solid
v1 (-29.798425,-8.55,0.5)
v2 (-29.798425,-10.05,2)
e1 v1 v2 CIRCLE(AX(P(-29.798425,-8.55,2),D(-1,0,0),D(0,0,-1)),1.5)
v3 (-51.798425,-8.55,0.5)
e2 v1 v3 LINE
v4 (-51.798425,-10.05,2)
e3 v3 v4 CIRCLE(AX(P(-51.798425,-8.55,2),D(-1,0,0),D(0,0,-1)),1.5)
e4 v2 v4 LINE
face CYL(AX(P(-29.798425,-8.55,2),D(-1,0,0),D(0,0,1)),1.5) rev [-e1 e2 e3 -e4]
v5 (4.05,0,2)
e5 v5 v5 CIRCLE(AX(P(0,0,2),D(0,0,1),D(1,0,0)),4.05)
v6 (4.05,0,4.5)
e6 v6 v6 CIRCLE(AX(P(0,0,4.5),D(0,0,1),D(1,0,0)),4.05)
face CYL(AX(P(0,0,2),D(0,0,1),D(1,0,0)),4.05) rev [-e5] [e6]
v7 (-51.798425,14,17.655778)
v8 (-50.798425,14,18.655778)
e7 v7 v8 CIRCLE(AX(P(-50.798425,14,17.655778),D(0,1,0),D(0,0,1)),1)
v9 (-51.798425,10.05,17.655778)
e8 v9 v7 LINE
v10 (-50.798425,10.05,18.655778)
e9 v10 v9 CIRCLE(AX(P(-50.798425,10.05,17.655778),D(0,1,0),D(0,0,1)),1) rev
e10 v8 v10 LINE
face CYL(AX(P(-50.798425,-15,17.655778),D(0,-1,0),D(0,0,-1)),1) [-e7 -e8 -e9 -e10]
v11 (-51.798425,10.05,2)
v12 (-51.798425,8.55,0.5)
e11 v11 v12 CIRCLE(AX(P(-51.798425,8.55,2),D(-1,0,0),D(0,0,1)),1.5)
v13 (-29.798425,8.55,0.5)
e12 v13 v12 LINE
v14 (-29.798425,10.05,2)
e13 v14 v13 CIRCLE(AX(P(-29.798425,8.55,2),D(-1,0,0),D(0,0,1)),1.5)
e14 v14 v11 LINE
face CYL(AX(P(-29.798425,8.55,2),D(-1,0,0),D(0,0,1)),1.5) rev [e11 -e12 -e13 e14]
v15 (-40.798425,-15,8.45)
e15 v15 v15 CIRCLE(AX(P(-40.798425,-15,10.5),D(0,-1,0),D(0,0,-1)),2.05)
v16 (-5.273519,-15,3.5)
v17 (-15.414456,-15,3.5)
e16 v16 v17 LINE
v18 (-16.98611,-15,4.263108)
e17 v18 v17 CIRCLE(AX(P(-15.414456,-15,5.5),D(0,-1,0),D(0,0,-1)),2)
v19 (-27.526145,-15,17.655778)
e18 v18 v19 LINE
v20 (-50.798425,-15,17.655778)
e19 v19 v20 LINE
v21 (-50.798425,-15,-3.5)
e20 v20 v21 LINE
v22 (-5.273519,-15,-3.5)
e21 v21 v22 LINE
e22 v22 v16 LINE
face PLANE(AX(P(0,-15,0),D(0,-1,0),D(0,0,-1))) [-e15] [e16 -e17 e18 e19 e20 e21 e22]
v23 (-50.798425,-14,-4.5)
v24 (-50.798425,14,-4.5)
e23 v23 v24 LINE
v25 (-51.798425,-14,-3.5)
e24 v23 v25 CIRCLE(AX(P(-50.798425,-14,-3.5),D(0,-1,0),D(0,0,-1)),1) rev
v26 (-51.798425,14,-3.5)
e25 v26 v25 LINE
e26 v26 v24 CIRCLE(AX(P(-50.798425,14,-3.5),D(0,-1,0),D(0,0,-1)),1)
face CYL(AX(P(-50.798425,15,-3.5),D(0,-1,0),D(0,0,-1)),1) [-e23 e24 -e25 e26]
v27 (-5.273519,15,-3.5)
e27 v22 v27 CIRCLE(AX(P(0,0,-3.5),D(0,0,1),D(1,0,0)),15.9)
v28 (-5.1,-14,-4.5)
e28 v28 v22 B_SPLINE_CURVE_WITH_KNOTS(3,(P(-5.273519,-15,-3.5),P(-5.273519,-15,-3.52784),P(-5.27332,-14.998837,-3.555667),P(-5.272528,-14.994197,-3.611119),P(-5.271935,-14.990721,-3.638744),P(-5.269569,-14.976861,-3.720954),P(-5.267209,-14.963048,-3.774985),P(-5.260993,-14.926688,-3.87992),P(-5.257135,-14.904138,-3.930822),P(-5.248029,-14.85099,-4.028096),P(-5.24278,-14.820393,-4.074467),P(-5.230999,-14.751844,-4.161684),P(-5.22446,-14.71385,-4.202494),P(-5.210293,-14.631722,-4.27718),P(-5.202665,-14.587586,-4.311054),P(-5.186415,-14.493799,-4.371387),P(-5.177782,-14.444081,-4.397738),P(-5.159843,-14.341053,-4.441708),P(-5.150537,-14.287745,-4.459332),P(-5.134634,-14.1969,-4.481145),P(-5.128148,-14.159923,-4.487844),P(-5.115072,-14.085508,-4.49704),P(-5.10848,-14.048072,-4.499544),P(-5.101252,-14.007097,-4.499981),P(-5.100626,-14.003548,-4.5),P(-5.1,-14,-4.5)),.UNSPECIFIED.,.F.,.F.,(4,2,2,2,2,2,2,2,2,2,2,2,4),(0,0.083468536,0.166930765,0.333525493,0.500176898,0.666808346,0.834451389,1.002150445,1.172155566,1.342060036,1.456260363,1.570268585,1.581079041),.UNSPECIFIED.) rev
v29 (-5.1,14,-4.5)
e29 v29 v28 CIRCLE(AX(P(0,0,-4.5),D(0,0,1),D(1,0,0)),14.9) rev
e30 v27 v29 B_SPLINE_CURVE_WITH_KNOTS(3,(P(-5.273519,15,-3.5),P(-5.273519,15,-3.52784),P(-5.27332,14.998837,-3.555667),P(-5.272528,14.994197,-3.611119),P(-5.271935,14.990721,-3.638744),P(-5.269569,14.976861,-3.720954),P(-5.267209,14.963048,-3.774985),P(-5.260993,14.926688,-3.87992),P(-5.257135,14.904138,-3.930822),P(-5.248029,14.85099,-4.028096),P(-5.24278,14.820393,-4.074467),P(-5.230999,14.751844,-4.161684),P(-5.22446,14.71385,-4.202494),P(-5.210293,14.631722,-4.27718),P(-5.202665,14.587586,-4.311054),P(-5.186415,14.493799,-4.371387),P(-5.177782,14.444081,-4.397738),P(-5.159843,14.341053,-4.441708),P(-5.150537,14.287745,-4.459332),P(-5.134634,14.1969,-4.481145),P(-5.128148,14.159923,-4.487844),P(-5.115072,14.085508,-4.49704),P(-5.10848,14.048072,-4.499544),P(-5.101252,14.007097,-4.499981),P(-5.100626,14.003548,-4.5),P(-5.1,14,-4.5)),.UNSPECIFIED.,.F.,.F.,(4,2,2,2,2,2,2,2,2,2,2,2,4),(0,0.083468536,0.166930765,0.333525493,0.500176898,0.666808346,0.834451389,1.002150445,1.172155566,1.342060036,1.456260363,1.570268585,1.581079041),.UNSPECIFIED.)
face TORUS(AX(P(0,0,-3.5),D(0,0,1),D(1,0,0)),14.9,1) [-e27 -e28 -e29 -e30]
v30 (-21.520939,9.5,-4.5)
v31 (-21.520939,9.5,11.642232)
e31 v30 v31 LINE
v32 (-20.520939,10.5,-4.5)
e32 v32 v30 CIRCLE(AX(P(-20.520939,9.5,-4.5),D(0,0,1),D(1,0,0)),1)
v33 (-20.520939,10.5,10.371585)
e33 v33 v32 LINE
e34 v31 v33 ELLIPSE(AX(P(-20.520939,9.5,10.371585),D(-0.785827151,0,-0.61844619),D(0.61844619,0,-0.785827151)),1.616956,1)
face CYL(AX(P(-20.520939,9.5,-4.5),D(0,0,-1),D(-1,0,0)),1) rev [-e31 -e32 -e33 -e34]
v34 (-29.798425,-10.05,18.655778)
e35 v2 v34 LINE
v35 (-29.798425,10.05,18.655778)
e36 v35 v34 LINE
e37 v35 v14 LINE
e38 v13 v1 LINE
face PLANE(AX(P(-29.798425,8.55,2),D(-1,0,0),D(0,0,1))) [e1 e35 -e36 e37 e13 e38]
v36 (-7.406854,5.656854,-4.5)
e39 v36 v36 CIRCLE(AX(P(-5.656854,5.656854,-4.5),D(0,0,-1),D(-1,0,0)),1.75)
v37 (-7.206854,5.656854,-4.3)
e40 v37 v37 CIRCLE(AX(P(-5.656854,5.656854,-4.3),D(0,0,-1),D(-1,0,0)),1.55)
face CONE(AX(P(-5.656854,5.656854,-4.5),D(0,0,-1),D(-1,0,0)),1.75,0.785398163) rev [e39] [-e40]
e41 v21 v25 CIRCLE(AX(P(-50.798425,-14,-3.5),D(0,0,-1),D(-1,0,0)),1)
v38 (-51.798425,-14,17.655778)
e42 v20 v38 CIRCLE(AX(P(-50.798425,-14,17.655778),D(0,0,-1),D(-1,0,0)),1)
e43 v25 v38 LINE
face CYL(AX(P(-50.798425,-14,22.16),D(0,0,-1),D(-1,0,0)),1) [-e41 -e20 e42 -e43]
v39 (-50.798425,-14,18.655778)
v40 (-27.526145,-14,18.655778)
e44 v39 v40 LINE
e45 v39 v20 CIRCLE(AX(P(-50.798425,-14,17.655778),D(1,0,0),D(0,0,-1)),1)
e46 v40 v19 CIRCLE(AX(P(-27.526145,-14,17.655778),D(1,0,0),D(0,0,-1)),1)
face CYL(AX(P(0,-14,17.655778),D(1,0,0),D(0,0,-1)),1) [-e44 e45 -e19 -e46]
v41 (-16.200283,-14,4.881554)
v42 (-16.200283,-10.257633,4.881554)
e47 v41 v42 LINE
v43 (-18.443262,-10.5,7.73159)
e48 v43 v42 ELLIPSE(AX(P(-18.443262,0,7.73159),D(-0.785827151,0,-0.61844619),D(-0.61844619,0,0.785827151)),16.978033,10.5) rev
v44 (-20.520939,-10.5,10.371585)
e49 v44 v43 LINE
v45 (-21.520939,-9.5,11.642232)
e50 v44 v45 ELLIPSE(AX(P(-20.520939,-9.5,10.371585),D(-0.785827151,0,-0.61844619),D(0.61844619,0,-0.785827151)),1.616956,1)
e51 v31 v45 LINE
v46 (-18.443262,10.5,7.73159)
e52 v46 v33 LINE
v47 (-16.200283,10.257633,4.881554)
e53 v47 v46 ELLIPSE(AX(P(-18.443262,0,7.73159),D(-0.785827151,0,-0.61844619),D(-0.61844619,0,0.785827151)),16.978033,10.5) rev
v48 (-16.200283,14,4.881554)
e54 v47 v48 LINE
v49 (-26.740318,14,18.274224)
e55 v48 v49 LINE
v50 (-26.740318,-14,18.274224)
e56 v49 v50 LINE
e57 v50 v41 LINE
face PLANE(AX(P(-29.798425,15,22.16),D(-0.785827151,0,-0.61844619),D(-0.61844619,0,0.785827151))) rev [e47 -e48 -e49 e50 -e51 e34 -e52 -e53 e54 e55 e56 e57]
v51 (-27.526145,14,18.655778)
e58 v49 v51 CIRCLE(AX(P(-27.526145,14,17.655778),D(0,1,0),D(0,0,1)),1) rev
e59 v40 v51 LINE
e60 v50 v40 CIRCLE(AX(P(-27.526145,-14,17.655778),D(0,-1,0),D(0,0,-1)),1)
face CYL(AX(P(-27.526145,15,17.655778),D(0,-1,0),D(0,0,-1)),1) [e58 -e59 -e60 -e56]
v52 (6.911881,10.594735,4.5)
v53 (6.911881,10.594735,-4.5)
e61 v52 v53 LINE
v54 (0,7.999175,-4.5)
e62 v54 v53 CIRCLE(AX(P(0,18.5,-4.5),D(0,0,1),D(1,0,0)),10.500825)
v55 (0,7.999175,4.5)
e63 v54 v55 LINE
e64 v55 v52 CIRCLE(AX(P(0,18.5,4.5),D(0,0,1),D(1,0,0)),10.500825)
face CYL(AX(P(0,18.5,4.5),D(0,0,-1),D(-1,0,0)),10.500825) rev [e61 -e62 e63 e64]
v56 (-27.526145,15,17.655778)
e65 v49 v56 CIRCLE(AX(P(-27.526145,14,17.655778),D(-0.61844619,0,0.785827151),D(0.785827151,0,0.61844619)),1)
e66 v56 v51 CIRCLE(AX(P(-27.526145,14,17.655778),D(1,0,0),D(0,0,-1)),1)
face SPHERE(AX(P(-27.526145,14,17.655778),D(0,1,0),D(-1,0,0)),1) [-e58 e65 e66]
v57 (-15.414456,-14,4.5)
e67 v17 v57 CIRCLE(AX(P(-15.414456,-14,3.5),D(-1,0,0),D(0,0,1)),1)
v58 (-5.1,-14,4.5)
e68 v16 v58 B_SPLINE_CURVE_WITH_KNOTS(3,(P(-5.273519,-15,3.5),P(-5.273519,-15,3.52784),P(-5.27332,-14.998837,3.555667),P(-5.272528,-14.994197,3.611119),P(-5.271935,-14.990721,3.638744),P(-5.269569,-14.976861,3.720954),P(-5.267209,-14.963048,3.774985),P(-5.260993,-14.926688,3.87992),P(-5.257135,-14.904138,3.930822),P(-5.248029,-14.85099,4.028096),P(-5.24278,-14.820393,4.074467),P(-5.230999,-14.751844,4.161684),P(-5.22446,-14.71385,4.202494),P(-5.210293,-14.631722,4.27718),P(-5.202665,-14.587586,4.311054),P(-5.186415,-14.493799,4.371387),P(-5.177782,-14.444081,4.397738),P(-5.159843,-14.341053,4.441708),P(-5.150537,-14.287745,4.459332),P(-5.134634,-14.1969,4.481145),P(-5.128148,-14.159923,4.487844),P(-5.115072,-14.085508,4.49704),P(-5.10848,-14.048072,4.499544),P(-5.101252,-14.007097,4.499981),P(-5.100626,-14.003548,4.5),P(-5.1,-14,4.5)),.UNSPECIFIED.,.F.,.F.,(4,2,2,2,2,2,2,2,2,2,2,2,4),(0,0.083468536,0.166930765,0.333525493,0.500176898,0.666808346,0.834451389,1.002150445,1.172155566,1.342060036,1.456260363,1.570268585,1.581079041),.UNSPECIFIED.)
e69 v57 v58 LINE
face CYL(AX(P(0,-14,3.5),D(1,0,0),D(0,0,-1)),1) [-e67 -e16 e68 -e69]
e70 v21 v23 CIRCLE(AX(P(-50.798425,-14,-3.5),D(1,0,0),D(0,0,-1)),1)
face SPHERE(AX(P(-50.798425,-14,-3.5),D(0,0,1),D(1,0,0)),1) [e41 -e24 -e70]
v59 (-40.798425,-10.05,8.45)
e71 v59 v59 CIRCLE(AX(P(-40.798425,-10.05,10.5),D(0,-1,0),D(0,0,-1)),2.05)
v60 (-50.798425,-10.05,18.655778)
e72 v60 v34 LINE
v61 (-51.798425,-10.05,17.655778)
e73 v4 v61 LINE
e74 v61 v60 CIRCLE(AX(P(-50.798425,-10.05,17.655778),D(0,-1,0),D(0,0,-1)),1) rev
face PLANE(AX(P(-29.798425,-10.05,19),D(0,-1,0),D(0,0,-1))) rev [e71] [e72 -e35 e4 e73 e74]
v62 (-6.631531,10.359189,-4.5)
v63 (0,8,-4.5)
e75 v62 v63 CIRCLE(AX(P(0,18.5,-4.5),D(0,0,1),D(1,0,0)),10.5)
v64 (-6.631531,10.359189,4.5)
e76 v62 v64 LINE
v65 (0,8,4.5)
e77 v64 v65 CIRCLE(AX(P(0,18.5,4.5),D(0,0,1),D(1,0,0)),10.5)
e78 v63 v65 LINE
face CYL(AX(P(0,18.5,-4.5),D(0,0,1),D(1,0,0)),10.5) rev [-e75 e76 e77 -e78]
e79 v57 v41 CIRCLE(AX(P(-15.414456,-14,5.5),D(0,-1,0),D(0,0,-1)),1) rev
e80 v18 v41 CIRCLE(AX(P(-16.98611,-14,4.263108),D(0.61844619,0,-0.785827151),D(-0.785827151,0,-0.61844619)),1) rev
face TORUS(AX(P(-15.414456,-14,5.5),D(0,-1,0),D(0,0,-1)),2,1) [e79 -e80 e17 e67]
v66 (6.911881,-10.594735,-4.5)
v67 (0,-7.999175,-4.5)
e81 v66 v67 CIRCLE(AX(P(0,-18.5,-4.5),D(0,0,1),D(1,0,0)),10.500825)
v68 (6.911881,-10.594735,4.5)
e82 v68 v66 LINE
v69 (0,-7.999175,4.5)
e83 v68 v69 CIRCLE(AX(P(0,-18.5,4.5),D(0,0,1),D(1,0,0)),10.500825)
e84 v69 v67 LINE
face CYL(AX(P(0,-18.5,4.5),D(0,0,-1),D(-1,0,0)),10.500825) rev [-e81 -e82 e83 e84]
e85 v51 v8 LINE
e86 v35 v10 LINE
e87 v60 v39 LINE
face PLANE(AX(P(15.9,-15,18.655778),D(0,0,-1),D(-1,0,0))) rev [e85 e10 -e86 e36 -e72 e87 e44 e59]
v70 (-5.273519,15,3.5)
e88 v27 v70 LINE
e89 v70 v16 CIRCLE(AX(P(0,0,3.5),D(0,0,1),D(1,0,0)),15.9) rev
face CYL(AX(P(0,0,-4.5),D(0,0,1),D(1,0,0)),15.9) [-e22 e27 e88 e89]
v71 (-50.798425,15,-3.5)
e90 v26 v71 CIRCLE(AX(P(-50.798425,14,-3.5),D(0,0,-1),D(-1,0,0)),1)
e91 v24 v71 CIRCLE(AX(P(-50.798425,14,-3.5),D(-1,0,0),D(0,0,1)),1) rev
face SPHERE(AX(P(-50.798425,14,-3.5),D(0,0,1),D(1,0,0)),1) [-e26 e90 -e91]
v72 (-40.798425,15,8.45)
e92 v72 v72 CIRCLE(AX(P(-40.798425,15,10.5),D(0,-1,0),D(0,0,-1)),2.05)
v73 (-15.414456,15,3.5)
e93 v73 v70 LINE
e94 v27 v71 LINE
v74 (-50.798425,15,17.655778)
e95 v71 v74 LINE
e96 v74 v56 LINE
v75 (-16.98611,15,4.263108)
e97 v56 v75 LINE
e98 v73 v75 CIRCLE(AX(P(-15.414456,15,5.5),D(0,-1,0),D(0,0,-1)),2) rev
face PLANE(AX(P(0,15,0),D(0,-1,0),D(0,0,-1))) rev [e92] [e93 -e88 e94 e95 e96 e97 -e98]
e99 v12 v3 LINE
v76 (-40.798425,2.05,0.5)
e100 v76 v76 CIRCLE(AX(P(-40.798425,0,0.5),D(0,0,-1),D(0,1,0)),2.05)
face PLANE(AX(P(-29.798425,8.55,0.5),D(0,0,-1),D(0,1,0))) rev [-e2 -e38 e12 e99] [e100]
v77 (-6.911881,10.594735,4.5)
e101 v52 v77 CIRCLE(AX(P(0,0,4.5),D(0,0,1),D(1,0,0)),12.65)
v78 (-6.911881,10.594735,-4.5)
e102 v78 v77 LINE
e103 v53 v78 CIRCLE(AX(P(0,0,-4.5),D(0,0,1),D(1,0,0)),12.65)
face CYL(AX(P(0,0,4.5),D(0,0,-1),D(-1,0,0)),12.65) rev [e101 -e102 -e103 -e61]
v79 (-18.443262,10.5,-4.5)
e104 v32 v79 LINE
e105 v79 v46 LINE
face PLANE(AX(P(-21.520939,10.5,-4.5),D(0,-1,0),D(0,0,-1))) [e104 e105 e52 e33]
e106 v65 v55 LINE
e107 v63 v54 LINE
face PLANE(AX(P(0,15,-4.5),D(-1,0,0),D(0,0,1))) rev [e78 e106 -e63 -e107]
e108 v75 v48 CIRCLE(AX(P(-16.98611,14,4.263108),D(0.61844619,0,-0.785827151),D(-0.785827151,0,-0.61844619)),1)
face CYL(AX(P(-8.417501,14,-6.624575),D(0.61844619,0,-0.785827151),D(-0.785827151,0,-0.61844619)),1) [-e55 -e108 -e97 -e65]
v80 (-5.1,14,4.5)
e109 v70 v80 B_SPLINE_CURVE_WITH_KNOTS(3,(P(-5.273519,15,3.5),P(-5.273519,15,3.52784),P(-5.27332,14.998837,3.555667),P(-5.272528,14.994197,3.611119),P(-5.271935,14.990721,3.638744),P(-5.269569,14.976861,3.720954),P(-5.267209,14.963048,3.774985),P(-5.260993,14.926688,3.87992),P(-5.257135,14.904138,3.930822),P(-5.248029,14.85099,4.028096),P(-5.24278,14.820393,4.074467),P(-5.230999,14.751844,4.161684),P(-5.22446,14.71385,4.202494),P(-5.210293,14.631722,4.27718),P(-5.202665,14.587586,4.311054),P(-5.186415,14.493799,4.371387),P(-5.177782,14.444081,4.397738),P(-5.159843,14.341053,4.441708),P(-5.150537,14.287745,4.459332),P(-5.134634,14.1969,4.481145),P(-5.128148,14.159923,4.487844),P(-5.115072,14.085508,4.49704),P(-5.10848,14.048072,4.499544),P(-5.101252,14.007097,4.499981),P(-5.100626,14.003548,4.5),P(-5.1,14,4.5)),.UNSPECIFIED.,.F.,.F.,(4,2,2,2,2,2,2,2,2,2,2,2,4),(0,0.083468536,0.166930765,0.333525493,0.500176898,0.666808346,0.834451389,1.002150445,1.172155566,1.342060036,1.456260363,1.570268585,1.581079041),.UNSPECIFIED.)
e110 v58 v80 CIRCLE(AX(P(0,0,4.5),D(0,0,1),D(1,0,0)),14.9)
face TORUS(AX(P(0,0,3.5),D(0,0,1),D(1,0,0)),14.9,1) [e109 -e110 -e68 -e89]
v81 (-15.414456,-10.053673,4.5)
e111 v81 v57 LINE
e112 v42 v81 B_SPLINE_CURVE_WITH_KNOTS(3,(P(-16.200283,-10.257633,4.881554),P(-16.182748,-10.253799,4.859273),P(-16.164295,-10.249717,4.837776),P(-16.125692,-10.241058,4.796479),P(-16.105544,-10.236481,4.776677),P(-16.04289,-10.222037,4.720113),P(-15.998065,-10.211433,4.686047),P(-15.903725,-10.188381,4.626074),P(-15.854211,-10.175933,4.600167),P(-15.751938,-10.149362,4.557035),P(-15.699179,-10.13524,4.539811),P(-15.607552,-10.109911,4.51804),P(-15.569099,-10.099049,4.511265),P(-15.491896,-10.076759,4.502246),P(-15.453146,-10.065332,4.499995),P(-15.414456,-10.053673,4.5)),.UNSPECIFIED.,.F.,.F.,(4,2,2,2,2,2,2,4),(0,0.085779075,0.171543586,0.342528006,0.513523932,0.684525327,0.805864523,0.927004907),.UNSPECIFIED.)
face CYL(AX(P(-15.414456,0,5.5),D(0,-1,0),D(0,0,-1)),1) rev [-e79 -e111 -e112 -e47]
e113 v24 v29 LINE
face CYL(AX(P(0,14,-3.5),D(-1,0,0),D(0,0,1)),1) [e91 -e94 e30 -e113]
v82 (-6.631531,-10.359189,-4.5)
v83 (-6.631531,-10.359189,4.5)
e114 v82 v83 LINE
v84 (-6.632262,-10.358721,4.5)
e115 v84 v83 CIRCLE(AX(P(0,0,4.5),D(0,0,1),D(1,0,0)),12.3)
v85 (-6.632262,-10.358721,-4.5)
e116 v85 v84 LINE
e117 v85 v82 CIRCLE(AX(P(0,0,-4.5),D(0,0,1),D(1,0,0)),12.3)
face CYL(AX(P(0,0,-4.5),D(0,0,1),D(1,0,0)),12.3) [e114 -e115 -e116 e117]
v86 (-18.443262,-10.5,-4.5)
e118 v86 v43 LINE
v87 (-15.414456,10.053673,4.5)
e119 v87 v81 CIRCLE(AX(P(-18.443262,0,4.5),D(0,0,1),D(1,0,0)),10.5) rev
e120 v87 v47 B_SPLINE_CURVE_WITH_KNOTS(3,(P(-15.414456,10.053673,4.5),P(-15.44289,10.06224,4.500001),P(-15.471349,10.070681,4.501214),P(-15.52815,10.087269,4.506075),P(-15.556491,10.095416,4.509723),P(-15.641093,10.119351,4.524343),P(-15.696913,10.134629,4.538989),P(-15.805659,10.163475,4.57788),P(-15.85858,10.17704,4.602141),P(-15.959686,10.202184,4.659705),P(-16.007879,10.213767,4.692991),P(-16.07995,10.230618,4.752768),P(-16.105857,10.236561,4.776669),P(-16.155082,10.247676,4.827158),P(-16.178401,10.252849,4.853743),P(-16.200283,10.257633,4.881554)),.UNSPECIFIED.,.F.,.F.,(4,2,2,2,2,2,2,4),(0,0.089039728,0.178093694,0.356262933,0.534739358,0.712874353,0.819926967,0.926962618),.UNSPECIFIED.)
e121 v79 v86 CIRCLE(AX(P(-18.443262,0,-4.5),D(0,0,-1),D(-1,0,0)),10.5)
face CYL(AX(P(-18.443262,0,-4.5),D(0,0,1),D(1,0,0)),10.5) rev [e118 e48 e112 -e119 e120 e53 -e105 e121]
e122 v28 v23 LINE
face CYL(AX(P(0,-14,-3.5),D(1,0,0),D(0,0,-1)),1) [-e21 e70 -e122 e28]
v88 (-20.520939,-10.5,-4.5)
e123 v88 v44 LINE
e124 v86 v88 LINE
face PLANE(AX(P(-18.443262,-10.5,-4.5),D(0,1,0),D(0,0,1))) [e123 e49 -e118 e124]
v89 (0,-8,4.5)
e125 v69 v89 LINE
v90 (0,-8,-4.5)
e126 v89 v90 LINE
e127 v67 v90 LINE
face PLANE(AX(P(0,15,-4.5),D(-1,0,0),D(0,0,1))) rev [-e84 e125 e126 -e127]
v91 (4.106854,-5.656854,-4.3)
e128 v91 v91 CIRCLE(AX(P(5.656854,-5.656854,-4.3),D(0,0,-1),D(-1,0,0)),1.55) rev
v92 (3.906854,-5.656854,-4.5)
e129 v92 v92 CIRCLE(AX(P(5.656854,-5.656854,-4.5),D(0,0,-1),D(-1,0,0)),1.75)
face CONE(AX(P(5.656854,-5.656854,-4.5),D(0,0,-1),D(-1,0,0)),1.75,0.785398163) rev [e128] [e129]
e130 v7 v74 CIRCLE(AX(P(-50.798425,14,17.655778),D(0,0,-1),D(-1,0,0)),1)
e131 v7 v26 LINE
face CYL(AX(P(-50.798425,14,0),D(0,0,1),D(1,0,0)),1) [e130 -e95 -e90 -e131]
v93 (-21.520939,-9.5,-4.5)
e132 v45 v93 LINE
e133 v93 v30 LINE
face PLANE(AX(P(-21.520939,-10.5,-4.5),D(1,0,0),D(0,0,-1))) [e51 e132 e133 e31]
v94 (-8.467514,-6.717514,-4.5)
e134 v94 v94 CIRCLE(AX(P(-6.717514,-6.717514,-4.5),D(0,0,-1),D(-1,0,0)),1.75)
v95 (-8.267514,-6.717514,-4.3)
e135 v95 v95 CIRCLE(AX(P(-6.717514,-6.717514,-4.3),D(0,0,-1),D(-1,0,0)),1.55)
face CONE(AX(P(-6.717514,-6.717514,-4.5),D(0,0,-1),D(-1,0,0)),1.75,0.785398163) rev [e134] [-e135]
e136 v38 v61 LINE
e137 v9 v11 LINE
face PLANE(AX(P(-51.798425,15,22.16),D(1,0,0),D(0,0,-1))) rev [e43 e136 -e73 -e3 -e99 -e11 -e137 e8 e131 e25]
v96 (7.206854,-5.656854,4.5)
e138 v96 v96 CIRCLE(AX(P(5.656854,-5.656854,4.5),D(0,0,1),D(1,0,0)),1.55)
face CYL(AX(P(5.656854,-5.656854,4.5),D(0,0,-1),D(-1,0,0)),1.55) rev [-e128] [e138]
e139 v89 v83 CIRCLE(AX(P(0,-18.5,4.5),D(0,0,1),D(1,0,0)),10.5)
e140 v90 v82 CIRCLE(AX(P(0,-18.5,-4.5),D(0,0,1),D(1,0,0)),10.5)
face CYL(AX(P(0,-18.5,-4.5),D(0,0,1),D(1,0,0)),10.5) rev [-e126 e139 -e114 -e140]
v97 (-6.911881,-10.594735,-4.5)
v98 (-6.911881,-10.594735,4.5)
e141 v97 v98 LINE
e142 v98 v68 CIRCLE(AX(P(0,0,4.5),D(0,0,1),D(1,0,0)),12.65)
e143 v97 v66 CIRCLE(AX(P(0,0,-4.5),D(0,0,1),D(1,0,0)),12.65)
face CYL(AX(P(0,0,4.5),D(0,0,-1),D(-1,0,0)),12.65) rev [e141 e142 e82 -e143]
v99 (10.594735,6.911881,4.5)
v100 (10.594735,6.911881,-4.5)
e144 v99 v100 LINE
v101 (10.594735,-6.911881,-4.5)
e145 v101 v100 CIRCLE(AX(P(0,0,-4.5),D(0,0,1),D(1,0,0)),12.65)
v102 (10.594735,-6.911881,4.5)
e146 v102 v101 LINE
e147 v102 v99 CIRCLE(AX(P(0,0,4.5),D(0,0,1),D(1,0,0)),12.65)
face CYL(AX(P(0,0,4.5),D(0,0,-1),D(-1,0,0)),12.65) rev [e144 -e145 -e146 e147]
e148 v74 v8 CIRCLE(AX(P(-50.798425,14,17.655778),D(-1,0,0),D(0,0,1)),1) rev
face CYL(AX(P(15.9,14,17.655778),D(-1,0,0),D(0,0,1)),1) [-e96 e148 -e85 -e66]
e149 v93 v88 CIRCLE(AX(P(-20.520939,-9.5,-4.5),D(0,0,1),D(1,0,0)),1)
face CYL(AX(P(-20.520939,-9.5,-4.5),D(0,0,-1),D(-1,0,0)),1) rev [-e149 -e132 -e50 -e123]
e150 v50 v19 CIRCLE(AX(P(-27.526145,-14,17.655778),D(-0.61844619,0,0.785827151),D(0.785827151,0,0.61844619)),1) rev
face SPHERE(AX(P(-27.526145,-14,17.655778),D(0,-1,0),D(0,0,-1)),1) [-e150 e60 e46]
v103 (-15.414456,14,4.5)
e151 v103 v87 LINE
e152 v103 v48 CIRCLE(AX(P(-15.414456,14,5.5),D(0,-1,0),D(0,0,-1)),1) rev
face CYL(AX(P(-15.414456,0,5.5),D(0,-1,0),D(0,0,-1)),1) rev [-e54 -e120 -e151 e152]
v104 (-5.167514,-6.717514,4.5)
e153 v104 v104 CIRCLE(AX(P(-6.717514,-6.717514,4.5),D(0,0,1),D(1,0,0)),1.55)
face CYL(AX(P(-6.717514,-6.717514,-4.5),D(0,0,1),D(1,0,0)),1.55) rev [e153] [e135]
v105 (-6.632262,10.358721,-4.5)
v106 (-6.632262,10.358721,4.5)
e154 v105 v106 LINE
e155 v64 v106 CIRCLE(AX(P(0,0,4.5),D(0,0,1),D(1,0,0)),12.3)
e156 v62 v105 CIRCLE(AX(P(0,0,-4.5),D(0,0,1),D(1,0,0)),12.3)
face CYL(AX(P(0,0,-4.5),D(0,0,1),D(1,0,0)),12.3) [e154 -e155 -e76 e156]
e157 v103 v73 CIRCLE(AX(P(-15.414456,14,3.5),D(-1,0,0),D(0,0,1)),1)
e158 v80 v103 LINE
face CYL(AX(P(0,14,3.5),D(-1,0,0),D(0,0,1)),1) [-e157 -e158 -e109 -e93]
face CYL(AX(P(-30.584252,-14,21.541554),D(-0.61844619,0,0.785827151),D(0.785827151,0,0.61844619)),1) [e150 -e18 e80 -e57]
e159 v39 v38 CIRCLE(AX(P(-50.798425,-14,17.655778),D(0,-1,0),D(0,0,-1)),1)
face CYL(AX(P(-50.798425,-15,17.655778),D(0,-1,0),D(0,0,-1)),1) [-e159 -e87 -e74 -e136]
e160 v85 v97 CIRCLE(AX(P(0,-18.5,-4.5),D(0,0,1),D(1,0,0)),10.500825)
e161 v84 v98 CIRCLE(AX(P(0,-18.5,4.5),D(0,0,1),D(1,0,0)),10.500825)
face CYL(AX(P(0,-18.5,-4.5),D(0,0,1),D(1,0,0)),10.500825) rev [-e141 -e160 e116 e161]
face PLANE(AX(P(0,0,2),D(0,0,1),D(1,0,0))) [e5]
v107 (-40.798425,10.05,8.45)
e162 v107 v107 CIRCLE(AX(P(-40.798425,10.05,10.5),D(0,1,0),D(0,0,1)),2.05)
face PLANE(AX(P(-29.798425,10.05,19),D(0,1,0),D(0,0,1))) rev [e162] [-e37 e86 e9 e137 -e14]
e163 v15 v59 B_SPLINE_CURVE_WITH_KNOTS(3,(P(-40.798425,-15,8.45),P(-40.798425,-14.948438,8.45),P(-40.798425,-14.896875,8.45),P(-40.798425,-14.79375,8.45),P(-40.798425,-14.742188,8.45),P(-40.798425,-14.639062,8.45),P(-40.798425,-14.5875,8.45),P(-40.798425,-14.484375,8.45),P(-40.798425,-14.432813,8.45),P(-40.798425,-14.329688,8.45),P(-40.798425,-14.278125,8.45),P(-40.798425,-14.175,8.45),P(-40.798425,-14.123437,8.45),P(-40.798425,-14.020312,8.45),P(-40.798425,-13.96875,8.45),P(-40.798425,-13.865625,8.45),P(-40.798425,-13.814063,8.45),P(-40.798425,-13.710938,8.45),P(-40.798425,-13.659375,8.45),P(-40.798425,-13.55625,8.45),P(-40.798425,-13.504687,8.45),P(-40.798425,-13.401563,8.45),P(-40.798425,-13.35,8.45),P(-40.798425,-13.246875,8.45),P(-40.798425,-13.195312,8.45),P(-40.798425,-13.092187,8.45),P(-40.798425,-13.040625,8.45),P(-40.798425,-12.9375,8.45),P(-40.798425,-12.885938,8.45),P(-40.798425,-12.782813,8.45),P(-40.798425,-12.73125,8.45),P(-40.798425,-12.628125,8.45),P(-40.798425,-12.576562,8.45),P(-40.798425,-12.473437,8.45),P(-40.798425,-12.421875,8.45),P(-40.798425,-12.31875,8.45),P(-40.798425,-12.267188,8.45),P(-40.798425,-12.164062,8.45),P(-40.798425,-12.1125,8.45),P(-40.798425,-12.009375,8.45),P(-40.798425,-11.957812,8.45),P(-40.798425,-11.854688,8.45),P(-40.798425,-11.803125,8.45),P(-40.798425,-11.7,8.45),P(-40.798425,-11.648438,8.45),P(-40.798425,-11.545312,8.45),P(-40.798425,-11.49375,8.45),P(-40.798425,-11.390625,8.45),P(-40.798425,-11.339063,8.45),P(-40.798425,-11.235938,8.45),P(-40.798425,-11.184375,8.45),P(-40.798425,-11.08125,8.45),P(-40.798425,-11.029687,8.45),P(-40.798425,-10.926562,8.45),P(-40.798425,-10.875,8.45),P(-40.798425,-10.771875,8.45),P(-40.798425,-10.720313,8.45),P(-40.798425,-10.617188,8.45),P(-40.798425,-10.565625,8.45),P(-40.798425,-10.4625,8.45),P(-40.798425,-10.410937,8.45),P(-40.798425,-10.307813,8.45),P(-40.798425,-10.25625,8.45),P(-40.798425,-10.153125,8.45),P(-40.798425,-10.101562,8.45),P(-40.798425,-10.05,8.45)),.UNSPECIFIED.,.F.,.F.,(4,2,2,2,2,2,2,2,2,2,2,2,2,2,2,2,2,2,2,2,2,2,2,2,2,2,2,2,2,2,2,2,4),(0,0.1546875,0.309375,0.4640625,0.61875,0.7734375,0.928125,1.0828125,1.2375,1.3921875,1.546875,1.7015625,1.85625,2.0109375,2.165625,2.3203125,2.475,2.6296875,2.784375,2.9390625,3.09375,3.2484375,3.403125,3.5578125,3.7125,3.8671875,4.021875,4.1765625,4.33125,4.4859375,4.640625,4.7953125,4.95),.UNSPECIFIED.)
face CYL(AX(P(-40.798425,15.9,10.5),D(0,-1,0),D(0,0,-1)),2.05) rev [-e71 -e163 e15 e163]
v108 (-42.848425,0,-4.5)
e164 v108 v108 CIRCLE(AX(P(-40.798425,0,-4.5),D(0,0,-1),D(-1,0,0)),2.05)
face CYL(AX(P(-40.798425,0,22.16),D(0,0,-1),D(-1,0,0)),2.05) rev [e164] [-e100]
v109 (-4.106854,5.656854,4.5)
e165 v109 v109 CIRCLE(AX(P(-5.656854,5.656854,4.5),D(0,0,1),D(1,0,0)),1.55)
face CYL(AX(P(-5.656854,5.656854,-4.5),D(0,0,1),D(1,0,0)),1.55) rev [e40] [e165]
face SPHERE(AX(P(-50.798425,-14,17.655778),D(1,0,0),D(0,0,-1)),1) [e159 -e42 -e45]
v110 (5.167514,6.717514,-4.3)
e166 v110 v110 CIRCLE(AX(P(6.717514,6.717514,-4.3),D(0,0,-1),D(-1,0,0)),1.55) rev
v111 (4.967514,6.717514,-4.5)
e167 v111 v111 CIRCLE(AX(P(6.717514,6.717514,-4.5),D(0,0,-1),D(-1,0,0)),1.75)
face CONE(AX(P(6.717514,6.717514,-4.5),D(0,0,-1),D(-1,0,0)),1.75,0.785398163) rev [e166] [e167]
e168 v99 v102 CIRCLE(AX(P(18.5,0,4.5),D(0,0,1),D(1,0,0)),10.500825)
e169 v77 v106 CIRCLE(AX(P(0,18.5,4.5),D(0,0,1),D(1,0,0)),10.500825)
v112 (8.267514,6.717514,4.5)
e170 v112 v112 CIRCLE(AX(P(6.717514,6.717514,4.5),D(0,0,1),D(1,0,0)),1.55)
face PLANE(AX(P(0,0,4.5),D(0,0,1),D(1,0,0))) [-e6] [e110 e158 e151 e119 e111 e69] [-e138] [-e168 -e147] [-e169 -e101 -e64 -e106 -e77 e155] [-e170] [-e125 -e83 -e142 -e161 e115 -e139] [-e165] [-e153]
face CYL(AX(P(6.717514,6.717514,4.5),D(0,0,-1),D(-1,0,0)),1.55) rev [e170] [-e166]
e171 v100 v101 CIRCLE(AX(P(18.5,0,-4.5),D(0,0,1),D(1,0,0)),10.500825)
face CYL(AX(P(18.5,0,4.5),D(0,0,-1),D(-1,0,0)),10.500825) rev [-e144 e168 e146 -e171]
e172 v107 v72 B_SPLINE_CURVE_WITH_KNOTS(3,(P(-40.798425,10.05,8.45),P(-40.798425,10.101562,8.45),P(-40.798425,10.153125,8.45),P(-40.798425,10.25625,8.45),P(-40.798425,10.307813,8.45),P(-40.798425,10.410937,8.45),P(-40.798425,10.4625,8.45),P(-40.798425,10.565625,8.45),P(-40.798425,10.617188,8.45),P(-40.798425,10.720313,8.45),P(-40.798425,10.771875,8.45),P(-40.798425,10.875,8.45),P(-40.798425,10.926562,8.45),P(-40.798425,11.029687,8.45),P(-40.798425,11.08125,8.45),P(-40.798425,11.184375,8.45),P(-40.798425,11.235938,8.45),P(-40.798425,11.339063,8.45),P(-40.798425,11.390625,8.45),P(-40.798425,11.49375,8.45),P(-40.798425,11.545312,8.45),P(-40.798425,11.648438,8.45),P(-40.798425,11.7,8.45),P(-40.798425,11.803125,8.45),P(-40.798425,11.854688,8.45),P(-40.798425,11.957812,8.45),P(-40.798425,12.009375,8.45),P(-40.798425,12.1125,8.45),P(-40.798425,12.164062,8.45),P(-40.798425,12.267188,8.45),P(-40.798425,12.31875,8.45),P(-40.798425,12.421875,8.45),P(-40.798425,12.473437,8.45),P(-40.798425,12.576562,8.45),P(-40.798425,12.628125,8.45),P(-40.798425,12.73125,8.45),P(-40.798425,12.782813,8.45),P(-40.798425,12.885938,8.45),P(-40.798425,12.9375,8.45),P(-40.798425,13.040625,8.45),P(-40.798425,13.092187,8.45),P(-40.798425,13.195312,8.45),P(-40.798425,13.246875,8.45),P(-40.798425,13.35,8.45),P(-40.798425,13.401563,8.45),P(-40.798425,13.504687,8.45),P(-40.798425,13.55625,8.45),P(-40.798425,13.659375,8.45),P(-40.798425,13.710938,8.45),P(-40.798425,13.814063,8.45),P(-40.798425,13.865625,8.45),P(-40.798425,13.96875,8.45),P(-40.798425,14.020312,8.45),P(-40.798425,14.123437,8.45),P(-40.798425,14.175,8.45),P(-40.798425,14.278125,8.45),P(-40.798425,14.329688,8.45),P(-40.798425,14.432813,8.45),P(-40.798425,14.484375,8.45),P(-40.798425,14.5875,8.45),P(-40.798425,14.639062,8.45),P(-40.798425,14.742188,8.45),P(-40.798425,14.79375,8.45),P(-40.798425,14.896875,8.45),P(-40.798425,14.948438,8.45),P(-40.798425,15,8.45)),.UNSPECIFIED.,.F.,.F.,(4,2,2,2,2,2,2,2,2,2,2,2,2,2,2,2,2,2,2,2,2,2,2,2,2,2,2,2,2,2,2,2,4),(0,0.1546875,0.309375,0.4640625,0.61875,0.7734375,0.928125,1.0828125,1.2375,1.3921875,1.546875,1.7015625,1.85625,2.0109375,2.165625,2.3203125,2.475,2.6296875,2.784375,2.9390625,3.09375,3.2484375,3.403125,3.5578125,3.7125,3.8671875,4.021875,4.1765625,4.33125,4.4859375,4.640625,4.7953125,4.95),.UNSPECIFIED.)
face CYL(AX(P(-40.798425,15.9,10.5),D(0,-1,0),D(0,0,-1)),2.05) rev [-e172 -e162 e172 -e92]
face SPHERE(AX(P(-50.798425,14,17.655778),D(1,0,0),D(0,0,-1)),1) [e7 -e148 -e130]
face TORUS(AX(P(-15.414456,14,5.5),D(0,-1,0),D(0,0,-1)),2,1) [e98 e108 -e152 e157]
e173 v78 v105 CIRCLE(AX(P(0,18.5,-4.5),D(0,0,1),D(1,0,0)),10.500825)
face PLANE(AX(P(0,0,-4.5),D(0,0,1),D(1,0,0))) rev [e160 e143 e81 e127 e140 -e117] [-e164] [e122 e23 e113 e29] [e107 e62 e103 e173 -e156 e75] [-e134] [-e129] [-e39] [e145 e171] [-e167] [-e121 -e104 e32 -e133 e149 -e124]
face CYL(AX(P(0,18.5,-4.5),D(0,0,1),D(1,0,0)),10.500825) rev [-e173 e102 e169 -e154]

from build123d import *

# Parameters (mm, degrees)
ESQUISSE4_R                   = 13.9
ESQUISSE4_R_2                 = 1.55
BOSS_EXTRU_3_DEPTH            = 4.5
ESQUISSE7_R                   = 15.9
ESQUISSE7_R_2                 = 13.9
BOSS_EXTRU_7_DEPTH            = 9
BOSS_EXTRU_8_DEPTH            = 30
ENL_V_START                   = -4.5
ENL_V_MAT_EXTRU_12_OUTLINE_R  = 1.55
ENL_V_MAT_EXTRU_12_DEPTH      = 9
TROU_TARAUD_M32_D             = 2.5
TROU_TARAUD_M32_DEPTH         = 26.66
TROU_TARAUD_M32_CSINK_D       = 3.5
TROU_TARAUD_M32_CSINK_ANGLE   = 90
ENL_V_MAT_EXTRU_1_DEPTH       = 22
ESQUISSE13_R                  = 2.05
ENL_V_MAT_EXTRU_4_DEPTH       = 65.256925163
ESQUISSE15_R                  = 2.05
ENL_V_MAT_EXTRU_5_DEPTH       = 61.387436039
ENL_V_MAT_EXTRU_6_DEPTH       = 73.985973625
ESQUISSE24_R                  = 4.05
ENL_V_MAT_EXTRU_9_DEPTH       = 2.5
TROU_TARAUD_M33_D             = 2.5
TROU_TARAUD_M33_DEPTH         = 23.155777755
TROU_TARAUD_M33_CSINK_D       = 3.5
TROU_TARAUD_M33_CSINK_ANGLE   = 90
CONG_2_R                      = 1
ENL_V_MAT_EXTRU_13_DEPTH      = 57.002436454
ENL_V_MAT_EXTRU_13_DEPTH_BACK = 57.002436454
CONG_3_R                      = 1
CONG_4_R                      = 1


# Read off the part's stored shape, not the designer's step: Enlèv. mat.-Extru.12
with BuildPart() as part:
    # Esquisse4 → Boss.-Extru.3 (new, symmetric)
    with BuildSketch(Plane.XY):
        Circle(ESQUISSE4_R)
        with Locations((-6.717514421, -6.717514421)):
            Circle(ESQUISSE4_R_2, mode=Mode.SUBTRACT)
        with Locations((6.717514421, 6.717514421)):
            Circle(ESQUISSE4_R_2, mode=Mode.SUBTRACT)
        with Locations((-5.656854249, 5.656854249)):
            Circle(ESQUISSE4_R_2, mode=Mode.SUBTRACT)
        with Locations((5.656854249, -5.656854249)):
            Circle(ESQUISSE4_R_2, mode=Mode.SUBTRACT)
        with BuildLine():
            ThreePointArc((-10.594734512, 6.911881121), (-12.65, 0), (-10.594734512, -6.911881121))
            ThreePointArc((-10.594734512, -6.911881121), (-7.999175124, 0), (-10.594734512, 6.911881121))
        make_face(mode=Mode.SUBTRACT)
        with BuildLine():
            ThreePointArc((6.911881121, -10.594734512), (0, -7.999175124), (-6.911881121, -10.594734512))
            ThreePointArc((-6.911881121, -10.594734512), (0, -12.65), (6.911881121, -10.594734512))
        make_face(mode=Mode.SUBTRACT)
        with BuildLine():
            ThreePointArc((-6.911881121, 10.594734512), (0, 7.999175124), (6.911881121, 10.594734512))
            ThreePointArc((6.911881121, 10.594734512), (0, 12.65), (-6.911881121, 10.594734512))
        make_face(mode=Mode.SUBTRACT)
        with BuildLine():
            ThreePointArc((10.594734512, 6.911881121), (7.999175124, 0), (10.594734512, -6.911881121))
            ThreePointArc((10.594734512, -6.911881121), (12.65, 0), (10.594734512, 6.911881121))
        make_face(mode=Mode.SUBTRACT)
    extrude(amount=BOSS_EXTRU_3_DEPTH, both=True)

    # Esquisse7 → Boss.-Extru.7 (add)
    with BuildSketch(Plane.XY.offset(4.5)):
        Circle(ESQUISSE7_R)
        Circle(ESQUISSE7_R_2, mode=Mode.SUBTRACT)
    extrude(amount=-BOSS_EXTRU_7_DEPTH)

    # Esquisse6 → Boss.-Extru.8 (add)
    with BuildSketch(Plane(origin=(0, -15, 0), x_dir=(1, 0, 0), z_dir=(0, 1, 0))):
        Polygon((-51.798424989, -22.16), (-29.798424989, -22.16), (-15.9, -4.5), (0, -4.5), (0, 4.5), (-15.9, 4.5), (-51.798424989, 4.5), align=None)
    extrude(amount=BOSS_EXTRU_8_DEPTH)

    # Enlèv. mat.-Extru.12 outline → Enlèv. mat.-Extru.12 (cut)
    with BuildSketch(Plane.XY.offset(ENL_V_START)):
        with BuildLine():
            ThreePointArc((0, 12.65), (-3.605489456, 12.125301884), (-6.911881121, 10.594734512))
            ThreePointArc((-6.911881121, 10.594734512), (-6.773099648, 10.475509721), (-6.632262004, 10.358720998))
            ThreePointArc((-6.632262004, 10.358720998), (-6.631896353, 10.3589551), (-6.631530694, 10.359189189))
            ThreePointArc((-6.631530694, 10.359189189), (-3.519338467, 8.607363508), (0, 8))
            Line((0, 8), (0, 12.65))
        make_face()
        with BuildLine():
            ThreePointArc((-6.911881121, -10.594734512), (-3.605489456, -12.125301884), (0, -12.65))
            Line((0, -12.65), (0, -8))
            ThreePointArc((0, -8), (-3.519338467, -8.607363508), (-6.631530694, -10.359189189))
            ThreePointArc((-6.631530694, -10.359189189), (-6.631896353, -10.3589551), (-6.632262004, -10.358720998))
            ThreePointArc((-6.632262004, -10.358720998), (-6.773099648, -10.475509721), (-6.911881121, -10.594734512))
        make_face()
        with BuildLine():
            ThreePointArc((-10.358720998, 6.632262004), (-10.475509721, 6.773099648), (-10.594734512, 6.911881121))
            ThreePointArc((-10.594734512, 6.911881121), (-12.65, 0), (-10.594734512, -6.911881121))
            ThreePointArc((-10.594734512, -6.911881121), (-10.475509721, -6.773099648), (-10.358720998, -6.632262004))
            ThreePointArc((-10.358720998, -6.632262004), (-10.3589551, -6.631896353), (-10.359189189, -6.631530694))
            ThreePointArc((-10.359189189, -6.631530694), (-8, 0), (-10.359189189, 6.631530694))
            ThreePointArc((-10.359189189, 6.631530694), (-10.3589551, 6.631896353), (-10.358720998, 6.632262004))
        make_face()
        with Locations((-6.717514421, -6.717514421)):
            Circle(ENL_V_MAT_EXTRU_12_OUTLINE_R)
        with Locations((-5.656854249, 5.656854249)):
            Circle(ENL_V_MAT_EXTRU_12_OUTLINE_R)
    extrude(amount=ENL_V_MAT_EXTRU_12_DEPTH, mode=Mode.SUBTRACT)

    # Trou taraudé M32
    with Locations(Plane(origin=(5.656854249, -5.656854249, -4.5), x_dir=(-1, 0, 0), z_dir=(0, 0, -1))):
        with Locations((0, 0), (-1.060660172, 12.37436867)):
            CounterSinkHole(TROU_TARAUD_M32_D / 2, TROU_TARAUD_M32_CSINK_D / 2, depth=TROU_TARAUD_M32_DEPTH, counter_sink_angle=TROU_TARAUD_M32_CSINK_ANGLE)

    # Esquisse8 → Enlèv. mat.-Extru.1 (cut)
    with BuildSketch(Plane.ZY.offset(51.798424989)):
        with BuildLine():
            Line((19, 10.05), (2, 10.05))
            ThreePointArc((2, 10.05), (0.939339828, 9.610660172), (0.5, 8.55))
            Line((0.5, 8.55), (0.5, -8.55))
            ThreePointArc((0.5, -8.55), (0.939339828, -9.610660172), (2, -10.05))
            Line((2, -10.05), (19, -10.05))
            ThreePointArc((19, -10.05), (20.060660172, -9.610660172), (20.5, -8.55))
            Line((20.5, -8.55), (20.5, 8.55))
            ThreePointArc((20.5, 8.55), (20.060660172, 9.610660172), (19, 10.05))
        make_face()
    extrude(amount=-ENL_V_MAT_EXTRU_1_DEPTH, mode=Mode.SUBTRACT)

    # Esquisse13 → Enlèv. mat.-Extru.4 (cut, through all)
    with BuildSketch(Plane.XZ.offset(15)):
        with Locations(Location((-40.798424989, 10.5, 0), (0, 0, 270))):
            Circle(ESQUISSE13_R)
    extrude(amount=-ENL_V_MAT_EXTRU_4_DEPTH, mode=Mode.SUBTRACT)

    # Esquisse15 → Enlèv. mat.-Extru.5 (cut, through all)
    with BuildSketch(Plane(origin=(0, 0, -4.5), x_dir=(-1, 0, 0), z_dir=(0, 0, -1))):
        with Locations((40.798424989, 0)):
            Circle(ESQUISSE15_R)
    extrude(amount=-ENL_V_MAT_EXTRU_5_DEPTH, mode=Mode.SUBTRACT)

    # Esquisse16 → Enlèv. mat.-Extru.6 (cut, through all)
    with BuildSketch(Plane.ZY.offset(51.798424989)):
        Polygon((18.655777755, 10.05), (18.655777755, -10.05), (18.655777755, -15), (22.16, -15), (22.16, 15), (18.655777755, 15), align=None)
    extrude(amount=-ENL_V_MAT_EXTRU_6_DEPTH, mode=Mode.SUBTRACT)

    # Esquisse24 → Enlèv. mat.-Extru.9 (cut)
    with BuildSketch(Plane.XY.offset(4.5)):
        Circle(ESQUISSE24_R)
    extrude(amount=-ENL_V_MAT_EXTRU_9_DEPTH, mode=Mode.SUBTRACT)

    # Trou taraudé M33
    with Locations(Plane(origin=(0, 0, -4.5), x_dir=(-1, 0, 0), z_dir=(0, 0, -1))):
        with Locations((6.717514421, -6.717514421), (5.656854249, 5.656854249)):
            CounterSinkHole(TROU_TARAUD_M33_D / 2, TROU_TARAUD_M33_CSINK_D / 2, depth=TROU_TARAUD_M33_DEPTH, counter_sink_angle=TROU_TARAUD_M33_CSINK_ANGLE)

    # Congé2
    cong_2_edges = [part.edges().sort_by_distance(p)[0] for p in [
        (-21.470300546, -15, 11.577888877),
        (-21.470300546, 15, 11.577888877),
        (-39.419513041, 15, 18.655777755),
        (-27.040601092, 0, 18.655777755),
        (-39.419513041, -15, 18.655777755),
        (15.9, 0, -4.5),
        (15.9, 0, 4.5),
        (-15.9, 0, 4.5),
        (-10.586759375, -15, 4.5),
        (-28.535971869, -15, -4.5),
        (-51.798424989, 0, -4.5),
        (-28.535971869, 15, -4.5),
        (-10.586759375, 15, 4.5),
    ]]
    fillet(cong_2_edges, radius=CONG_2_R)

    # Esquisse27 → Enlèv. mat.-Extru.13 (cut, two sides: drawn at the far end of the back side and taken through both)
    with BuildSketch(Plane.XY.offset(4.5).offset(-ENL_V_MAT_EXTRU_13_DEPTH_BACK)):
        with BuildLine():
            Line((-18.443262039, -10.5), (-21.520938865, -10.5))
            Line((-21.520938865, -10.5), (-21.520938865, 10.5))
            Line((-21.520938865, 10.5), (-18.443262039, 10.5))
            ThreePointArc((-18.443262039, 10.5), (-7.943262039, 0), (-18.443262039, -10.5))
        make_face()
    extrude(amount=ENL_V_MAT_EXTRU_13_DEPTH + ENL_V_MAT_EXTRU_13_DEPTH_BACK, mode=Mode.SUBTRACT)

    # Congé3
    cong_3_edges = [part.edges().sort_by_distance(p)[0] for p in [
        (-21.520938865, 10.5, 3.571116167),
        (-21.520938865, -10.5, 3.571116167),
    ]]
    fillet(cong_3_edges, radius=CONG_3_R)

    # Congé4
    # the kernel refuses this fillet: 1 mm, written as the material it takes off along each edge
    with BuildSketch(Plane(origin=(-50.798424989, 14, -3.5), x_dir=(-1, 0, 0), z_dir=(0, 1, 0))) as cong_4_piece_1_section:
        Polygon((0, 0), (CONG_4_R, 0), (CONG_4_R, -CONG_4_R), (0, -CONG_4_R), align=None)
    cong_4_piece_1 = extrude(amount=CONG_4_R, mode=Mode.PRIVATE)
    cong_4_piece_1 = cong_4_piece_1 - Plane(origin=(-50.798424989, 14, -3.5), x_dir=(0.7071067811865477, 0, 0.7071067811865475), z_dir=(0, 1, 0)) * Sphere(CONG_4_R, mode=Mode.PRIVATE)
    add(cong_4_piece_1, mode=Mode.SUBTRACT)
    with BuildSketch(Plane(origin=(-50.798424989, -14, -3.5), x_dir=(-1, 0, 0), z_dir=(0, -1, 0))) as cong_4_piece_2_section:
        Polygon((0, 0), (CONG_4_R, 0), (CONG_4_R, CONG_4_R), (0, CONG_4_R), align=None)
    cong_4_piece_2 = extrude(amount=CONG_4_R, mode=Mode.PRIVATE)
    cong_4_piece_2 = cong_4_piece_2 - Plane(origin=(-50.798424989, -14, -3.5), x_dir=(0.7071067811865477, 0, 0.7071067811865475), z_dir=(0, -1, 0)) * Sphere(CONG_4_R, mode=Mode.PRIVATE)
    add(cong_4_piece_2, mode=Mode.SUBTRACT)
    with BuildSketch(Plane(origin=(-51.798424989, -14, 18.655777755), x_dir=(1, 0, 0), z_dir=(0, 1, 0)), Plane(origin=(-51.798424989, 7.55, 18.655777755), x_dir=(1, 0, 0), z_dir=(0, 1, 0))) as cong_4_piece_3:
        with BuildLine():
            CenterArc((CONG_4_R, CONG_4_R), CONG_4_R, 180, 90)
            Line((0, CONG_4_R), (0, 0))
            Line((0, 0), (CONG_4_R, 0))
        make_face()
    extrude(amount=6.45, mode=Mode.SUBTRACT)
    with BuildSketch(Plane(origin=(-51.798424989, -15, -3.5), x_dir=(1, 0, 0), z_dir=(0, 0, 1))) as cong_4_piece_4:
        with BuildLine():
            CenterArc((CONG_4_R, CONG_4_R), CONG_4_R, 180, 90)
            Line((0, CONG_4_R), (0, 0))
            Line((0, 0), (CONG_4_R, 0))
        make_face()
    extrude(amount=21.155777755, mode=Mode.SUBTRACT)
    with BuildSketch(Plane(origin=(-51.798424989, 15, -3.5), x_dir=(1, 0, 0), z_dir=(0, 0, 1))) as cong_4_piece_5:
        with BuildLine():
            CenterArc((CONG_4_R, -CONG_4_R), CONG_4_R, 90, 90)
            Line((0, -CONG_4_R), (0, 0))
            Line((0, 0), (CONG_4_R, 0))
        make_face()
    extrude(amount=21.155777755, mode=Mode.SUBTRACT)
    with BuildSketch(Plane(origin=(-51.798424989, 14, 17.655777755), x_dir=(0, 0, 1), z_dir=(0, -1, 0))) as cong_4_piece_6:
        with BuildLine():
            CenterArc((1 - CONG_4_R, -CONG_4_R), CONG_4_R, 0, 90)
            Line((1, -CONG_4_R), (1, 0))
            Line((1, 0), (1 - CONG_4_R, 0))
        make_face()
    revolve(axis=Axis((-51.798424989, 14, 17.655777755), (-1, 0, 0)), revolution_arc=90, mode=Mode.SUBTRACT)
    with BuildSketch(Plane(origin=(-51.798424989, -14, 17.655777755), x_dir=(0, 0, 1), z_dir=(0, 1, 0))) as cong_4_piece_7:
        with BuildLine():
            CenterArc((1 - CONG_4_R, CONG_4_R), CONG_4_R, 270, 90)
            Line((1 - CONG_4_R, 0), (1, 0))
            Line((1, 0), (1, CONG_4_R))
        make_face()
    revolve(axis=Axis((-51.798424989, -14, 17.655777755), (1, 0, 0)), revolution_arc=90, mode=Mode.SUBTRACT)


solid = part.part
